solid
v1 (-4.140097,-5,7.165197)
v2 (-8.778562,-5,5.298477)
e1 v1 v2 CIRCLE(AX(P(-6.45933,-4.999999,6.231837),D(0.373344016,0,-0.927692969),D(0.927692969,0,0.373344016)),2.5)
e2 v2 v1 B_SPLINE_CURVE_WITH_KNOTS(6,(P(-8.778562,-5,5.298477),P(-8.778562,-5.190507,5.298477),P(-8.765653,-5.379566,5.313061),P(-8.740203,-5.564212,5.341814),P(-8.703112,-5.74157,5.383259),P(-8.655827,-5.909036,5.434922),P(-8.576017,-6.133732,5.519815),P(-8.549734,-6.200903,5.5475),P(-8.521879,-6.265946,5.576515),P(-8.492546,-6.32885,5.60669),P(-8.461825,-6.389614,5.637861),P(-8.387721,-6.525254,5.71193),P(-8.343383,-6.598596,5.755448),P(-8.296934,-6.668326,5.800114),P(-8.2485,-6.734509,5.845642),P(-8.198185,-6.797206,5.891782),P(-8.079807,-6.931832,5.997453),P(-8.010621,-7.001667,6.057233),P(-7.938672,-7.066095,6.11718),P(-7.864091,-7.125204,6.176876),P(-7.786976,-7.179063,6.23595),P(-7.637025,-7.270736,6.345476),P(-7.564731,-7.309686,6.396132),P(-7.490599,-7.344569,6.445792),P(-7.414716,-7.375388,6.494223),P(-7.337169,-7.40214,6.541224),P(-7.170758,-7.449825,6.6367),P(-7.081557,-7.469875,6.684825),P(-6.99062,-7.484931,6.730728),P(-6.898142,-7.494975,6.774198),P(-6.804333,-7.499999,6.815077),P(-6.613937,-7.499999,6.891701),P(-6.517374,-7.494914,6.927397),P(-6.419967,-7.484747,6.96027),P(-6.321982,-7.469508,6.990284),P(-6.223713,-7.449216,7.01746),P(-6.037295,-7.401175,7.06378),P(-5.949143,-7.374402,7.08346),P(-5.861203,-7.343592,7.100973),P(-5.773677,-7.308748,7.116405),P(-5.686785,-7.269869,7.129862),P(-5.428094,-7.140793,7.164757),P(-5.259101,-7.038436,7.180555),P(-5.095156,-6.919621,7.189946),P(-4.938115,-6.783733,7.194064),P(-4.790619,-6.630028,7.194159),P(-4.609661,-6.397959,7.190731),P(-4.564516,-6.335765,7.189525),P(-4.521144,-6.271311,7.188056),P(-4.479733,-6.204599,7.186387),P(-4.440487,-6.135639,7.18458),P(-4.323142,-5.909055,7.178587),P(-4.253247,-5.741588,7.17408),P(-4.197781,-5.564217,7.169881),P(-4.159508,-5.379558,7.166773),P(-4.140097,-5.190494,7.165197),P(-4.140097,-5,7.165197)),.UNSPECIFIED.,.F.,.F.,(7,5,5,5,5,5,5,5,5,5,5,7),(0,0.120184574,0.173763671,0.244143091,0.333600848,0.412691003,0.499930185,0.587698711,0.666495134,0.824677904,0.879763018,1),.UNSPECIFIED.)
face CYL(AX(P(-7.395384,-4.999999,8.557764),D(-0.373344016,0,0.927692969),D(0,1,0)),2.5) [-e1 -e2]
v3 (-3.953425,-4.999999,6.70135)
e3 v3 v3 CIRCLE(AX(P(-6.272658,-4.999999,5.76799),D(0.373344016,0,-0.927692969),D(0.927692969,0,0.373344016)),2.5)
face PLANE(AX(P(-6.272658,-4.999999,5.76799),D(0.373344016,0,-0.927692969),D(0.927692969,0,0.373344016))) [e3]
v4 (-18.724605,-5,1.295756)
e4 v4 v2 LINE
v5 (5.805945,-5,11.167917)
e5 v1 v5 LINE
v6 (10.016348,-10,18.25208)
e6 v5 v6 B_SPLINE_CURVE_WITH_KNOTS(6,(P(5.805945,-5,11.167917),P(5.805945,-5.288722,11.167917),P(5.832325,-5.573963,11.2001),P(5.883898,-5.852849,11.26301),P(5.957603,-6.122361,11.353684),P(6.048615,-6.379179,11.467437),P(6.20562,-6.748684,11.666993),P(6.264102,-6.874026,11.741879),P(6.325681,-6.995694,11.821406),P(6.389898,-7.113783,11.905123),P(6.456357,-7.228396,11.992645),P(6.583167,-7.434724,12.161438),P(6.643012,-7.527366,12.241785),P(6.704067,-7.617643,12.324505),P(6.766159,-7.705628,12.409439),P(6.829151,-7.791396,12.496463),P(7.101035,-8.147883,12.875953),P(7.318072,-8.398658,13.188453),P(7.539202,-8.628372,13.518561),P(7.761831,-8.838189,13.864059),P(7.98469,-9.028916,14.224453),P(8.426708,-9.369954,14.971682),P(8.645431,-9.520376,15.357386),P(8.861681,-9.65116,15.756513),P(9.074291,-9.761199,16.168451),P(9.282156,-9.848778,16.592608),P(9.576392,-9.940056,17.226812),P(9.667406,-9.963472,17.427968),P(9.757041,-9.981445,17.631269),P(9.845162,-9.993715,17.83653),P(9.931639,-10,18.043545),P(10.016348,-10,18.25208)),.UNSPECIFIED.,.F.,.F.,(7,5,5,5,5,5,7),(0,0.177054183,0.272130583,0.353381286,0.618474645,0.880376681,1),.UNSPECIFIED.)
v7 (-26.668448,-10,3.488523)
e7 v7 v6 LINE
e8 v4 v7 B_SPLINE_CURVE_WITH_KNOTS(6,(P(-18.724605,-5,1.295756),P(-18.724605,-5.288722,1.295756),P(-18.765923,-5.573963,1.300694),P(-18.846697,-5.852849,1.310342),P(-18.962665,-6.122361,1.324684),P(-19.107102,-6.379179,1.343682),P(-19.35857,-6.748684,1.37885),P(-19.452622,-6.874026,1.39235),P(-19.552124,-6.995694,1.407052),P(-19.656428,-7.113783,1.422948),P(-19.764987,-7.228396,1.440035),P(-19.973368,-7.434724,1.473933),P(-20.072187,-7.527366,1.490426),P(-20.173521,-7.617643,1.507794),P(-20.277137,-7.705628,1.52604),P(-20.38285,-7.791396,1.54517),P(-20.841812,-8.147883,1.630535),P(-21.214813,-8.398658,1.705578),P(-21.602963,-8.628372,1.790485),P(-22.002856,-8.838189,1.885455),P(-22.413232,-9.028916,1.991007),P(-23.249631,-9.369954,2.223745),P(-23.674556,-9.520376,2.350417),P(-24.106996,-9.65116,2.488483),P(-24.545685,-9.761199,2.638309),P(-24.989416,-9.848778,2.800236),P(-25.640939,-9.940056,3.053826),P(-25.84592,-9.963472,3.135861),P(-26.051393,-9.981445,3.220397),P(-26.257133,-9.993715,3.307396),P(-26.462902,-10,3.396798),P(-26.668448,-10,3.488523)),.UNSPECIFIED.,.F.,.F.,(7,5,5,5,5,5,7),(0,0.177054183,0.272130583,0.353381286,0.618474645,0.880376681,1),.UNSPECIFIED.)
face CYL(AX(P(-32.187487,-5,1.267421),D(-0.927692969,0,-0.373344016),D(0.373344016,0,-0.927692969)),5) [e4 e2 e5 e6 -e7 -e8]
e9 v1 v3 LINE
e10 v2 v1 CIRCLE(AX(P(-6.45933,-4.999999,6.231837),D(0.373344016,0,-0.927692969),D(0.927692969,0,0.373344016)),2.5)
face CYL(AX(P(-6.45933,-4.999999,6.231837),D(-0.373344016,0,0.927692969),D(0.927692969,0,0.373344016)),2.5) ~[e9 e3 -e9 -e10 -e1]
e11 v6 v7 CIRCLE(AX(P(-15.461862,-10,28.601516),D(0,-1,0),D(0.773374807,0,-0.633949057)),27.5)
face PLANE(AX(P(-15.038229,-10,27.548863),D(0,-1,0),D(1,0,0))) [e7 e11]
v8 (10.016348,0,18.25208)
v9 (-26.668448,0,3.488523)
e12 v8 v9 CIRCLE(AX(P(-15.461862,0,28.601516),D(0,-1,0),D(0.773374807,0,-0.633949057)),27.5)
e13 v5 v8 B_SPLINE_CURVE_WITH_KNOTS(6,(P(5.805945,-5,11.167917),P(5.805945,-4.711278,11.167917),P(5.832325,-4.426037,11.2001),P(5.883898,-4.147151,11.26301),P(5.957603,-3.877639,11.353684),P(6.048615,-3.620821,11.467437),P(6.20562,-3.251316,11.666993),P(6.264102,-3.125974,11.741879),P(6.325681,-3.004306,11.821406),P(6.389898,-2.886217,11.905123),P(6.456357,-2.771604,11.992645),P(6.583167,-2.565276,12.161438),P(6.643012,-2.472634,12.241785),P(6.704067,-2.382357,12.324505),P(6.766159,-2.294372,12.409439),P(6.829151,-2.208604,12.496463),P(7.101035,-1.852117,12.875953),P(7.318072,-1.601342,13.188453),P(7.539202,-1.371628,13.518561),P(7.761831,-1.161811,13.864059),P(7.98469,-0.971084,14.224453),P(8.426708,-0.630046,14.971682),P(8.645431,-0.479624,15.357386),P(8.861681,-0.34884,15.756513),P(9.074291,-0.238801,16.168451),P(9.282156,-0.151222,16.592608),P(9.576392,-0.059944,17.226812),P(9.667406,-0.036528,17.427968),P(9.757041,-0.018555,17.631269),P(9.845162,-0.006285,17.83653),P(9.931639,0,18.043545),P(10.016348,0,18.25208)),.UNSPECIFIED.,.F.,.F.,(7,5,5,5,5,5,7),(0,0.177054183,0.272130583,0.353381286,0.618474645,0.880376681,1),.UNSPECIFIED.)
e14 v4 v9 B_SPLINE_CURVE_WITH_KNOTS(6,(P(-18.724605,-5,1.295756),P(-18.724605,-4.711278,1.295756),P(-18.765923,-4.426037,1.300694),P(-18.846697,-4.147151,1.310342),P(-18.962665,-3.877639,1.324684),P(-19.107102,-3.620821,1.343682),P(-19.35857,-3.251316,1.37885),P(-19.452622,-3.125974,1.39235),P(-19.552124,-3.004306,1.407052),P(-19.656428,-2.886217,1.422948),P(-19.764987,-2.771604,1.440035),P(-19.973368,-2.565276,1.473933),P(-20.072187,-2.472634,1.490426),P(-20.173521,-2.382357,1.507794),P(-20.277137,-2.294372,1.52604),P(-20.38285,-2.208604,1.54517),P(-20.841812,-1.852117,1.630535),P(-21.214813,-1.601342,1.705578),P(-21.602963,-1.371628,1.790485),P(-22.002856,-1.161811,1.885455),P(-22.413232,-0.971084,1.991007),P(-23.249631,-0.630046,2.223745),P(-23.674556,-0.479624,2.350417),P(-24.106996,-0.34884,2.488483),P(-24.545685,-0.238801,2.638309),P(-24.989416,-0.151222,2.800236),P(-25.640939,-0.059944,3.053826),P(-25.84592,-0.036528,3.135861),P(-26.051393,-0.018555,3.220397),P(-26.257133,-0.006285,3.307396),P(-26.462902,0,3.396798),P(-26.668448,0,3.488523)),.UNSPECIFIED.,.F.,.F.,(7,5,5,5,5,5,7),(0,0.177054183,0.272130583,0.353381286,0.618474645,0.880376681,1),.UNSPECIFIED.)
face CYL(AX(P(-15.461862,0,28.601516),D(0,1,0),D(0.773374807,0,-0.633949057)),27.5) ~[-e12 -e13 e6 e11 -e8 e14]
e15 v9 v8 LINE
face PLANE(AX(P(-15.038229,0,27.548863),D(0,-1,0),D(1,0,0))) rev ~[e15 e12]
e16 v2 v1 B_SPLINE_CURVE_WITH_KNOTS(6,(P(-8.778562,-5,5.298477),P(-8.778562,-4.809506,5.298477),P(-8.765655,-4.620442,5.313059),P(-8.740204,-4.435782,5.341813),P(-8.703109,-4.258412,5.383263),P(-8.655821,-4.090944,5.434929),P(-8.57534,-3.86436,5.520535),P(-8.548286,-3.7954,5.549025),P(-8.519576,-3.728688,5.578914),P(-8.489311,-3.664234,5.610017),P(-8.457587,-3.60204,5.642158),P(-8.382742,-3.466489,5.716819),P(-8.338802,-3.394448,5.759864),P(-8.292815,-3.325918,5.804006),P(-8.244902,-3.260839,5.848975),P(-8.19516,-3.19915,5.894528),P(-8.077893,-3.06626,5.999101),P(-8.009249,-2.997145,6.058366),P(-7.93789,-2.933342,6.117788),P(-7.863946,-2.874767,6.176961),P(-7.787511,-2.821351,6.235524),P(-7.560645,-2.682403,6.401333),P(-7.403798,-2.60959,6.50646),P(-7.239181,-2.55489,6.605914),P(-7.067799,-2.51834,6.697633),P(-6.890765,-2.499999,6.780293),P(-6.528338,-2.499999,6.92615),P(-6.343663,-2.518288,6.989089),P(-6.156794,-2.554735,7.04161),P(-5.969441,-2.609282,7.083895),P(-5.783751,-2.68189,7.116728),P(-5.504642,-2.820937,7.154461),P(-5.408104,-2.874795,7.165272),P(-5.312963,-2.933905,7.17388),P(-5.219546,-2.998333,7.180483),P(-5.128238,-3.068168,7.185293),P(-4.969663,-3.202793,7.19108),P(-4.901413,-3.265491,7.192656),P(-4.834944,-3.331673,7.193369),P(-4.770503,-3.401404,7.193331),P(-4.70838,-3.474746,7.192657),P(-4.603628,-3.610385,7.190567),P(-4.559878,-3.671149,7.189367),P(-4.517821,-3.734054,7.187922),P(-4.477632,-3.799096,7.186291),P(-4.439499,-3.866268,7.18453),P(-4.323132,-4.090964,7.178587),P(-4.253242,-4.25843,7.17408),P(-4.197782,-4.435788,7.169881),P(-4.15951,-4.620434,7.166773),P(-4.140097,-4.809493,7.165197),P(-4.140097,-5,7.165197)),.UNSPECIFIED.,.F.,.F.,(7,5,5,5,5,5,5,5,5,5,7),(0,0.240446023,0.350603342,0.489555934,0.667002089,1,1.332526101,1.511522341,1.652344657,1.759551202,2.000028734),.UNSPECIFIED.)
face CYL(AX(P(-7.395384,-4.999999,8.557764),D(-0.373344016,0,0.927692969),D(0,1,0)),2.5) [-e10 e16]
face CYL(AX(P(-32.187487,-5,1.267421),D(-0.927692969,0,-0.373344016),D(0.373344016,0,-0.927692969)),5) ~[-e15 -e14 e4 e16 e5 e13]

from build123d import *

# Parameters (mm, degrees)
F1_DEPTH     = 10
F2_R         = 2.5
F3_DEPTH     = 0.5
F4_T4_DEPTH  = 51.44253063
F4_S5_R      = 2.5
F4_T6_DEPTH  = 29
F4_T10_DEPTH = 51.44253063
F4_S11_R     = 2.5
F4_T12_DEPTH = 29


# Not quite as in the source:
# - a fillet or chamfer that OpenCascade refuses, or shapes differently, is made with other operations: its cross-section is extruded or revolved along the edge and cut away or added


with BuildPart() as f1:
    # F0 (on Front) → F1 (new body)
    with BuildSketch(Plane.XZ):
        with BuildLine():
            Line((-18.7246046442, 1.2957563709), (5.805945114, 11.1679169591))
            ThreePointArc((5.805945114, 11.1679169591), (-25.7288225372, 54.1130726963), (-18.7246046442, 1.2957563709))
        make_face()
    extrude(amount=F1_DEPTH)

    # F2 (on face) → F3 (join)
    with BuildSketch(Plane(origin=(-3.0587265768, 0, 7.6003873539), x_dir=(0.9276929694, 0, 0.3733440164), z_dir=(0.3733440164, 0, -0.9276929694))):
        with Locations((-3.6656558802, 4.9999994226)):
            Circle(F2_R)
    extrude(amount=F3_DEPTH)

    # F4: fillet of radius 5 on 2 edges, made by hand


with BuildPart() as f4_tool2:
    # F4_s3 → F4_t4 (new body)
    with BuildSketch(Plane(origin=(-27.2620401847, 0, -10.9714311875), x_dir=(0, 1, 0), z_dir=(0.9276929694, 0, 0.3733440164))):
        with BuildLine():
            ThreePointArc((-5, 8.192783178), (-8.5355339059, 9.657249272), (-10, 13.192783178))
            Line((-10, 13.192783178), (-10, 8.192783178))
            Line((-10, 8.192783178), (-5, 8.192783178))
        make_face()
    extrude(amount=F4_T4_DEPTH)

    # F4_s5 → F4_t6 (cut, symmetric)
    with BuildSketch(Plane(origin=(-3.9947809751, 0, 9.9263147724), x_dir=(0, 1, 0), z_dir=(-0.3733440164, 0, 0.9276929694))):
        with Locations((-4.9999994226, 3.6656558802)):
            Circle(F4_S5_R)
    extrude(amount=F4_T6_DEPTH, both=True, mode=Mode.SUBTRACT)


with BuildPart() as f1_1:
    add(f1.part)

    # F4_t1: cut F4_tool2
    add(f4_tool2.part, mode=Mode.SUBTRACT)


with BuildPart() as f4_tool8:
    # F4_s9 → F4_t10 (new body)
    with BuildSketch(Plane(origin=(-27.2620401847, 0, -10.9714311875), x_dir=(0, 1, 0), z_dir=(0.9276929694, 0, 0.3733440164))):
        with BuildLine():
            ThreePointArc((-5, 8.192783178), (-1.4644660941, 9.657249272), (0, 13.192783178))
            Line((0, 13.192783178), (0, 8.192783178))
            Line((0, 8.192783178), (-5, 8.192783178))
        make_face()
    extrude(amount=F4_T10_DEPTH)

    # F4_s11 → F4_t12 (cut, symmetric)
    with BuildSketch(Plane(origin=(-3.9947809751, 0, 9.9263147724), x_dir=(0, 1, 0), z_dir=(-0.3733440164, 0, 0.9276929694))):
        with Locations((-4.9999994226, 3.6656558802)):
            Circle(F4_S11_R)
    extrude(amount=F4_T12_DEPTH, both=True, mode=Mode.SUBTRACT)


with BuildPart() as f1_2:
    add(f1_1.part)

    # F4_t7: cut F4_tool8
    add(f4_tool8.part, mode=Mode.SUBTRACT)


solid = f1_2.part
